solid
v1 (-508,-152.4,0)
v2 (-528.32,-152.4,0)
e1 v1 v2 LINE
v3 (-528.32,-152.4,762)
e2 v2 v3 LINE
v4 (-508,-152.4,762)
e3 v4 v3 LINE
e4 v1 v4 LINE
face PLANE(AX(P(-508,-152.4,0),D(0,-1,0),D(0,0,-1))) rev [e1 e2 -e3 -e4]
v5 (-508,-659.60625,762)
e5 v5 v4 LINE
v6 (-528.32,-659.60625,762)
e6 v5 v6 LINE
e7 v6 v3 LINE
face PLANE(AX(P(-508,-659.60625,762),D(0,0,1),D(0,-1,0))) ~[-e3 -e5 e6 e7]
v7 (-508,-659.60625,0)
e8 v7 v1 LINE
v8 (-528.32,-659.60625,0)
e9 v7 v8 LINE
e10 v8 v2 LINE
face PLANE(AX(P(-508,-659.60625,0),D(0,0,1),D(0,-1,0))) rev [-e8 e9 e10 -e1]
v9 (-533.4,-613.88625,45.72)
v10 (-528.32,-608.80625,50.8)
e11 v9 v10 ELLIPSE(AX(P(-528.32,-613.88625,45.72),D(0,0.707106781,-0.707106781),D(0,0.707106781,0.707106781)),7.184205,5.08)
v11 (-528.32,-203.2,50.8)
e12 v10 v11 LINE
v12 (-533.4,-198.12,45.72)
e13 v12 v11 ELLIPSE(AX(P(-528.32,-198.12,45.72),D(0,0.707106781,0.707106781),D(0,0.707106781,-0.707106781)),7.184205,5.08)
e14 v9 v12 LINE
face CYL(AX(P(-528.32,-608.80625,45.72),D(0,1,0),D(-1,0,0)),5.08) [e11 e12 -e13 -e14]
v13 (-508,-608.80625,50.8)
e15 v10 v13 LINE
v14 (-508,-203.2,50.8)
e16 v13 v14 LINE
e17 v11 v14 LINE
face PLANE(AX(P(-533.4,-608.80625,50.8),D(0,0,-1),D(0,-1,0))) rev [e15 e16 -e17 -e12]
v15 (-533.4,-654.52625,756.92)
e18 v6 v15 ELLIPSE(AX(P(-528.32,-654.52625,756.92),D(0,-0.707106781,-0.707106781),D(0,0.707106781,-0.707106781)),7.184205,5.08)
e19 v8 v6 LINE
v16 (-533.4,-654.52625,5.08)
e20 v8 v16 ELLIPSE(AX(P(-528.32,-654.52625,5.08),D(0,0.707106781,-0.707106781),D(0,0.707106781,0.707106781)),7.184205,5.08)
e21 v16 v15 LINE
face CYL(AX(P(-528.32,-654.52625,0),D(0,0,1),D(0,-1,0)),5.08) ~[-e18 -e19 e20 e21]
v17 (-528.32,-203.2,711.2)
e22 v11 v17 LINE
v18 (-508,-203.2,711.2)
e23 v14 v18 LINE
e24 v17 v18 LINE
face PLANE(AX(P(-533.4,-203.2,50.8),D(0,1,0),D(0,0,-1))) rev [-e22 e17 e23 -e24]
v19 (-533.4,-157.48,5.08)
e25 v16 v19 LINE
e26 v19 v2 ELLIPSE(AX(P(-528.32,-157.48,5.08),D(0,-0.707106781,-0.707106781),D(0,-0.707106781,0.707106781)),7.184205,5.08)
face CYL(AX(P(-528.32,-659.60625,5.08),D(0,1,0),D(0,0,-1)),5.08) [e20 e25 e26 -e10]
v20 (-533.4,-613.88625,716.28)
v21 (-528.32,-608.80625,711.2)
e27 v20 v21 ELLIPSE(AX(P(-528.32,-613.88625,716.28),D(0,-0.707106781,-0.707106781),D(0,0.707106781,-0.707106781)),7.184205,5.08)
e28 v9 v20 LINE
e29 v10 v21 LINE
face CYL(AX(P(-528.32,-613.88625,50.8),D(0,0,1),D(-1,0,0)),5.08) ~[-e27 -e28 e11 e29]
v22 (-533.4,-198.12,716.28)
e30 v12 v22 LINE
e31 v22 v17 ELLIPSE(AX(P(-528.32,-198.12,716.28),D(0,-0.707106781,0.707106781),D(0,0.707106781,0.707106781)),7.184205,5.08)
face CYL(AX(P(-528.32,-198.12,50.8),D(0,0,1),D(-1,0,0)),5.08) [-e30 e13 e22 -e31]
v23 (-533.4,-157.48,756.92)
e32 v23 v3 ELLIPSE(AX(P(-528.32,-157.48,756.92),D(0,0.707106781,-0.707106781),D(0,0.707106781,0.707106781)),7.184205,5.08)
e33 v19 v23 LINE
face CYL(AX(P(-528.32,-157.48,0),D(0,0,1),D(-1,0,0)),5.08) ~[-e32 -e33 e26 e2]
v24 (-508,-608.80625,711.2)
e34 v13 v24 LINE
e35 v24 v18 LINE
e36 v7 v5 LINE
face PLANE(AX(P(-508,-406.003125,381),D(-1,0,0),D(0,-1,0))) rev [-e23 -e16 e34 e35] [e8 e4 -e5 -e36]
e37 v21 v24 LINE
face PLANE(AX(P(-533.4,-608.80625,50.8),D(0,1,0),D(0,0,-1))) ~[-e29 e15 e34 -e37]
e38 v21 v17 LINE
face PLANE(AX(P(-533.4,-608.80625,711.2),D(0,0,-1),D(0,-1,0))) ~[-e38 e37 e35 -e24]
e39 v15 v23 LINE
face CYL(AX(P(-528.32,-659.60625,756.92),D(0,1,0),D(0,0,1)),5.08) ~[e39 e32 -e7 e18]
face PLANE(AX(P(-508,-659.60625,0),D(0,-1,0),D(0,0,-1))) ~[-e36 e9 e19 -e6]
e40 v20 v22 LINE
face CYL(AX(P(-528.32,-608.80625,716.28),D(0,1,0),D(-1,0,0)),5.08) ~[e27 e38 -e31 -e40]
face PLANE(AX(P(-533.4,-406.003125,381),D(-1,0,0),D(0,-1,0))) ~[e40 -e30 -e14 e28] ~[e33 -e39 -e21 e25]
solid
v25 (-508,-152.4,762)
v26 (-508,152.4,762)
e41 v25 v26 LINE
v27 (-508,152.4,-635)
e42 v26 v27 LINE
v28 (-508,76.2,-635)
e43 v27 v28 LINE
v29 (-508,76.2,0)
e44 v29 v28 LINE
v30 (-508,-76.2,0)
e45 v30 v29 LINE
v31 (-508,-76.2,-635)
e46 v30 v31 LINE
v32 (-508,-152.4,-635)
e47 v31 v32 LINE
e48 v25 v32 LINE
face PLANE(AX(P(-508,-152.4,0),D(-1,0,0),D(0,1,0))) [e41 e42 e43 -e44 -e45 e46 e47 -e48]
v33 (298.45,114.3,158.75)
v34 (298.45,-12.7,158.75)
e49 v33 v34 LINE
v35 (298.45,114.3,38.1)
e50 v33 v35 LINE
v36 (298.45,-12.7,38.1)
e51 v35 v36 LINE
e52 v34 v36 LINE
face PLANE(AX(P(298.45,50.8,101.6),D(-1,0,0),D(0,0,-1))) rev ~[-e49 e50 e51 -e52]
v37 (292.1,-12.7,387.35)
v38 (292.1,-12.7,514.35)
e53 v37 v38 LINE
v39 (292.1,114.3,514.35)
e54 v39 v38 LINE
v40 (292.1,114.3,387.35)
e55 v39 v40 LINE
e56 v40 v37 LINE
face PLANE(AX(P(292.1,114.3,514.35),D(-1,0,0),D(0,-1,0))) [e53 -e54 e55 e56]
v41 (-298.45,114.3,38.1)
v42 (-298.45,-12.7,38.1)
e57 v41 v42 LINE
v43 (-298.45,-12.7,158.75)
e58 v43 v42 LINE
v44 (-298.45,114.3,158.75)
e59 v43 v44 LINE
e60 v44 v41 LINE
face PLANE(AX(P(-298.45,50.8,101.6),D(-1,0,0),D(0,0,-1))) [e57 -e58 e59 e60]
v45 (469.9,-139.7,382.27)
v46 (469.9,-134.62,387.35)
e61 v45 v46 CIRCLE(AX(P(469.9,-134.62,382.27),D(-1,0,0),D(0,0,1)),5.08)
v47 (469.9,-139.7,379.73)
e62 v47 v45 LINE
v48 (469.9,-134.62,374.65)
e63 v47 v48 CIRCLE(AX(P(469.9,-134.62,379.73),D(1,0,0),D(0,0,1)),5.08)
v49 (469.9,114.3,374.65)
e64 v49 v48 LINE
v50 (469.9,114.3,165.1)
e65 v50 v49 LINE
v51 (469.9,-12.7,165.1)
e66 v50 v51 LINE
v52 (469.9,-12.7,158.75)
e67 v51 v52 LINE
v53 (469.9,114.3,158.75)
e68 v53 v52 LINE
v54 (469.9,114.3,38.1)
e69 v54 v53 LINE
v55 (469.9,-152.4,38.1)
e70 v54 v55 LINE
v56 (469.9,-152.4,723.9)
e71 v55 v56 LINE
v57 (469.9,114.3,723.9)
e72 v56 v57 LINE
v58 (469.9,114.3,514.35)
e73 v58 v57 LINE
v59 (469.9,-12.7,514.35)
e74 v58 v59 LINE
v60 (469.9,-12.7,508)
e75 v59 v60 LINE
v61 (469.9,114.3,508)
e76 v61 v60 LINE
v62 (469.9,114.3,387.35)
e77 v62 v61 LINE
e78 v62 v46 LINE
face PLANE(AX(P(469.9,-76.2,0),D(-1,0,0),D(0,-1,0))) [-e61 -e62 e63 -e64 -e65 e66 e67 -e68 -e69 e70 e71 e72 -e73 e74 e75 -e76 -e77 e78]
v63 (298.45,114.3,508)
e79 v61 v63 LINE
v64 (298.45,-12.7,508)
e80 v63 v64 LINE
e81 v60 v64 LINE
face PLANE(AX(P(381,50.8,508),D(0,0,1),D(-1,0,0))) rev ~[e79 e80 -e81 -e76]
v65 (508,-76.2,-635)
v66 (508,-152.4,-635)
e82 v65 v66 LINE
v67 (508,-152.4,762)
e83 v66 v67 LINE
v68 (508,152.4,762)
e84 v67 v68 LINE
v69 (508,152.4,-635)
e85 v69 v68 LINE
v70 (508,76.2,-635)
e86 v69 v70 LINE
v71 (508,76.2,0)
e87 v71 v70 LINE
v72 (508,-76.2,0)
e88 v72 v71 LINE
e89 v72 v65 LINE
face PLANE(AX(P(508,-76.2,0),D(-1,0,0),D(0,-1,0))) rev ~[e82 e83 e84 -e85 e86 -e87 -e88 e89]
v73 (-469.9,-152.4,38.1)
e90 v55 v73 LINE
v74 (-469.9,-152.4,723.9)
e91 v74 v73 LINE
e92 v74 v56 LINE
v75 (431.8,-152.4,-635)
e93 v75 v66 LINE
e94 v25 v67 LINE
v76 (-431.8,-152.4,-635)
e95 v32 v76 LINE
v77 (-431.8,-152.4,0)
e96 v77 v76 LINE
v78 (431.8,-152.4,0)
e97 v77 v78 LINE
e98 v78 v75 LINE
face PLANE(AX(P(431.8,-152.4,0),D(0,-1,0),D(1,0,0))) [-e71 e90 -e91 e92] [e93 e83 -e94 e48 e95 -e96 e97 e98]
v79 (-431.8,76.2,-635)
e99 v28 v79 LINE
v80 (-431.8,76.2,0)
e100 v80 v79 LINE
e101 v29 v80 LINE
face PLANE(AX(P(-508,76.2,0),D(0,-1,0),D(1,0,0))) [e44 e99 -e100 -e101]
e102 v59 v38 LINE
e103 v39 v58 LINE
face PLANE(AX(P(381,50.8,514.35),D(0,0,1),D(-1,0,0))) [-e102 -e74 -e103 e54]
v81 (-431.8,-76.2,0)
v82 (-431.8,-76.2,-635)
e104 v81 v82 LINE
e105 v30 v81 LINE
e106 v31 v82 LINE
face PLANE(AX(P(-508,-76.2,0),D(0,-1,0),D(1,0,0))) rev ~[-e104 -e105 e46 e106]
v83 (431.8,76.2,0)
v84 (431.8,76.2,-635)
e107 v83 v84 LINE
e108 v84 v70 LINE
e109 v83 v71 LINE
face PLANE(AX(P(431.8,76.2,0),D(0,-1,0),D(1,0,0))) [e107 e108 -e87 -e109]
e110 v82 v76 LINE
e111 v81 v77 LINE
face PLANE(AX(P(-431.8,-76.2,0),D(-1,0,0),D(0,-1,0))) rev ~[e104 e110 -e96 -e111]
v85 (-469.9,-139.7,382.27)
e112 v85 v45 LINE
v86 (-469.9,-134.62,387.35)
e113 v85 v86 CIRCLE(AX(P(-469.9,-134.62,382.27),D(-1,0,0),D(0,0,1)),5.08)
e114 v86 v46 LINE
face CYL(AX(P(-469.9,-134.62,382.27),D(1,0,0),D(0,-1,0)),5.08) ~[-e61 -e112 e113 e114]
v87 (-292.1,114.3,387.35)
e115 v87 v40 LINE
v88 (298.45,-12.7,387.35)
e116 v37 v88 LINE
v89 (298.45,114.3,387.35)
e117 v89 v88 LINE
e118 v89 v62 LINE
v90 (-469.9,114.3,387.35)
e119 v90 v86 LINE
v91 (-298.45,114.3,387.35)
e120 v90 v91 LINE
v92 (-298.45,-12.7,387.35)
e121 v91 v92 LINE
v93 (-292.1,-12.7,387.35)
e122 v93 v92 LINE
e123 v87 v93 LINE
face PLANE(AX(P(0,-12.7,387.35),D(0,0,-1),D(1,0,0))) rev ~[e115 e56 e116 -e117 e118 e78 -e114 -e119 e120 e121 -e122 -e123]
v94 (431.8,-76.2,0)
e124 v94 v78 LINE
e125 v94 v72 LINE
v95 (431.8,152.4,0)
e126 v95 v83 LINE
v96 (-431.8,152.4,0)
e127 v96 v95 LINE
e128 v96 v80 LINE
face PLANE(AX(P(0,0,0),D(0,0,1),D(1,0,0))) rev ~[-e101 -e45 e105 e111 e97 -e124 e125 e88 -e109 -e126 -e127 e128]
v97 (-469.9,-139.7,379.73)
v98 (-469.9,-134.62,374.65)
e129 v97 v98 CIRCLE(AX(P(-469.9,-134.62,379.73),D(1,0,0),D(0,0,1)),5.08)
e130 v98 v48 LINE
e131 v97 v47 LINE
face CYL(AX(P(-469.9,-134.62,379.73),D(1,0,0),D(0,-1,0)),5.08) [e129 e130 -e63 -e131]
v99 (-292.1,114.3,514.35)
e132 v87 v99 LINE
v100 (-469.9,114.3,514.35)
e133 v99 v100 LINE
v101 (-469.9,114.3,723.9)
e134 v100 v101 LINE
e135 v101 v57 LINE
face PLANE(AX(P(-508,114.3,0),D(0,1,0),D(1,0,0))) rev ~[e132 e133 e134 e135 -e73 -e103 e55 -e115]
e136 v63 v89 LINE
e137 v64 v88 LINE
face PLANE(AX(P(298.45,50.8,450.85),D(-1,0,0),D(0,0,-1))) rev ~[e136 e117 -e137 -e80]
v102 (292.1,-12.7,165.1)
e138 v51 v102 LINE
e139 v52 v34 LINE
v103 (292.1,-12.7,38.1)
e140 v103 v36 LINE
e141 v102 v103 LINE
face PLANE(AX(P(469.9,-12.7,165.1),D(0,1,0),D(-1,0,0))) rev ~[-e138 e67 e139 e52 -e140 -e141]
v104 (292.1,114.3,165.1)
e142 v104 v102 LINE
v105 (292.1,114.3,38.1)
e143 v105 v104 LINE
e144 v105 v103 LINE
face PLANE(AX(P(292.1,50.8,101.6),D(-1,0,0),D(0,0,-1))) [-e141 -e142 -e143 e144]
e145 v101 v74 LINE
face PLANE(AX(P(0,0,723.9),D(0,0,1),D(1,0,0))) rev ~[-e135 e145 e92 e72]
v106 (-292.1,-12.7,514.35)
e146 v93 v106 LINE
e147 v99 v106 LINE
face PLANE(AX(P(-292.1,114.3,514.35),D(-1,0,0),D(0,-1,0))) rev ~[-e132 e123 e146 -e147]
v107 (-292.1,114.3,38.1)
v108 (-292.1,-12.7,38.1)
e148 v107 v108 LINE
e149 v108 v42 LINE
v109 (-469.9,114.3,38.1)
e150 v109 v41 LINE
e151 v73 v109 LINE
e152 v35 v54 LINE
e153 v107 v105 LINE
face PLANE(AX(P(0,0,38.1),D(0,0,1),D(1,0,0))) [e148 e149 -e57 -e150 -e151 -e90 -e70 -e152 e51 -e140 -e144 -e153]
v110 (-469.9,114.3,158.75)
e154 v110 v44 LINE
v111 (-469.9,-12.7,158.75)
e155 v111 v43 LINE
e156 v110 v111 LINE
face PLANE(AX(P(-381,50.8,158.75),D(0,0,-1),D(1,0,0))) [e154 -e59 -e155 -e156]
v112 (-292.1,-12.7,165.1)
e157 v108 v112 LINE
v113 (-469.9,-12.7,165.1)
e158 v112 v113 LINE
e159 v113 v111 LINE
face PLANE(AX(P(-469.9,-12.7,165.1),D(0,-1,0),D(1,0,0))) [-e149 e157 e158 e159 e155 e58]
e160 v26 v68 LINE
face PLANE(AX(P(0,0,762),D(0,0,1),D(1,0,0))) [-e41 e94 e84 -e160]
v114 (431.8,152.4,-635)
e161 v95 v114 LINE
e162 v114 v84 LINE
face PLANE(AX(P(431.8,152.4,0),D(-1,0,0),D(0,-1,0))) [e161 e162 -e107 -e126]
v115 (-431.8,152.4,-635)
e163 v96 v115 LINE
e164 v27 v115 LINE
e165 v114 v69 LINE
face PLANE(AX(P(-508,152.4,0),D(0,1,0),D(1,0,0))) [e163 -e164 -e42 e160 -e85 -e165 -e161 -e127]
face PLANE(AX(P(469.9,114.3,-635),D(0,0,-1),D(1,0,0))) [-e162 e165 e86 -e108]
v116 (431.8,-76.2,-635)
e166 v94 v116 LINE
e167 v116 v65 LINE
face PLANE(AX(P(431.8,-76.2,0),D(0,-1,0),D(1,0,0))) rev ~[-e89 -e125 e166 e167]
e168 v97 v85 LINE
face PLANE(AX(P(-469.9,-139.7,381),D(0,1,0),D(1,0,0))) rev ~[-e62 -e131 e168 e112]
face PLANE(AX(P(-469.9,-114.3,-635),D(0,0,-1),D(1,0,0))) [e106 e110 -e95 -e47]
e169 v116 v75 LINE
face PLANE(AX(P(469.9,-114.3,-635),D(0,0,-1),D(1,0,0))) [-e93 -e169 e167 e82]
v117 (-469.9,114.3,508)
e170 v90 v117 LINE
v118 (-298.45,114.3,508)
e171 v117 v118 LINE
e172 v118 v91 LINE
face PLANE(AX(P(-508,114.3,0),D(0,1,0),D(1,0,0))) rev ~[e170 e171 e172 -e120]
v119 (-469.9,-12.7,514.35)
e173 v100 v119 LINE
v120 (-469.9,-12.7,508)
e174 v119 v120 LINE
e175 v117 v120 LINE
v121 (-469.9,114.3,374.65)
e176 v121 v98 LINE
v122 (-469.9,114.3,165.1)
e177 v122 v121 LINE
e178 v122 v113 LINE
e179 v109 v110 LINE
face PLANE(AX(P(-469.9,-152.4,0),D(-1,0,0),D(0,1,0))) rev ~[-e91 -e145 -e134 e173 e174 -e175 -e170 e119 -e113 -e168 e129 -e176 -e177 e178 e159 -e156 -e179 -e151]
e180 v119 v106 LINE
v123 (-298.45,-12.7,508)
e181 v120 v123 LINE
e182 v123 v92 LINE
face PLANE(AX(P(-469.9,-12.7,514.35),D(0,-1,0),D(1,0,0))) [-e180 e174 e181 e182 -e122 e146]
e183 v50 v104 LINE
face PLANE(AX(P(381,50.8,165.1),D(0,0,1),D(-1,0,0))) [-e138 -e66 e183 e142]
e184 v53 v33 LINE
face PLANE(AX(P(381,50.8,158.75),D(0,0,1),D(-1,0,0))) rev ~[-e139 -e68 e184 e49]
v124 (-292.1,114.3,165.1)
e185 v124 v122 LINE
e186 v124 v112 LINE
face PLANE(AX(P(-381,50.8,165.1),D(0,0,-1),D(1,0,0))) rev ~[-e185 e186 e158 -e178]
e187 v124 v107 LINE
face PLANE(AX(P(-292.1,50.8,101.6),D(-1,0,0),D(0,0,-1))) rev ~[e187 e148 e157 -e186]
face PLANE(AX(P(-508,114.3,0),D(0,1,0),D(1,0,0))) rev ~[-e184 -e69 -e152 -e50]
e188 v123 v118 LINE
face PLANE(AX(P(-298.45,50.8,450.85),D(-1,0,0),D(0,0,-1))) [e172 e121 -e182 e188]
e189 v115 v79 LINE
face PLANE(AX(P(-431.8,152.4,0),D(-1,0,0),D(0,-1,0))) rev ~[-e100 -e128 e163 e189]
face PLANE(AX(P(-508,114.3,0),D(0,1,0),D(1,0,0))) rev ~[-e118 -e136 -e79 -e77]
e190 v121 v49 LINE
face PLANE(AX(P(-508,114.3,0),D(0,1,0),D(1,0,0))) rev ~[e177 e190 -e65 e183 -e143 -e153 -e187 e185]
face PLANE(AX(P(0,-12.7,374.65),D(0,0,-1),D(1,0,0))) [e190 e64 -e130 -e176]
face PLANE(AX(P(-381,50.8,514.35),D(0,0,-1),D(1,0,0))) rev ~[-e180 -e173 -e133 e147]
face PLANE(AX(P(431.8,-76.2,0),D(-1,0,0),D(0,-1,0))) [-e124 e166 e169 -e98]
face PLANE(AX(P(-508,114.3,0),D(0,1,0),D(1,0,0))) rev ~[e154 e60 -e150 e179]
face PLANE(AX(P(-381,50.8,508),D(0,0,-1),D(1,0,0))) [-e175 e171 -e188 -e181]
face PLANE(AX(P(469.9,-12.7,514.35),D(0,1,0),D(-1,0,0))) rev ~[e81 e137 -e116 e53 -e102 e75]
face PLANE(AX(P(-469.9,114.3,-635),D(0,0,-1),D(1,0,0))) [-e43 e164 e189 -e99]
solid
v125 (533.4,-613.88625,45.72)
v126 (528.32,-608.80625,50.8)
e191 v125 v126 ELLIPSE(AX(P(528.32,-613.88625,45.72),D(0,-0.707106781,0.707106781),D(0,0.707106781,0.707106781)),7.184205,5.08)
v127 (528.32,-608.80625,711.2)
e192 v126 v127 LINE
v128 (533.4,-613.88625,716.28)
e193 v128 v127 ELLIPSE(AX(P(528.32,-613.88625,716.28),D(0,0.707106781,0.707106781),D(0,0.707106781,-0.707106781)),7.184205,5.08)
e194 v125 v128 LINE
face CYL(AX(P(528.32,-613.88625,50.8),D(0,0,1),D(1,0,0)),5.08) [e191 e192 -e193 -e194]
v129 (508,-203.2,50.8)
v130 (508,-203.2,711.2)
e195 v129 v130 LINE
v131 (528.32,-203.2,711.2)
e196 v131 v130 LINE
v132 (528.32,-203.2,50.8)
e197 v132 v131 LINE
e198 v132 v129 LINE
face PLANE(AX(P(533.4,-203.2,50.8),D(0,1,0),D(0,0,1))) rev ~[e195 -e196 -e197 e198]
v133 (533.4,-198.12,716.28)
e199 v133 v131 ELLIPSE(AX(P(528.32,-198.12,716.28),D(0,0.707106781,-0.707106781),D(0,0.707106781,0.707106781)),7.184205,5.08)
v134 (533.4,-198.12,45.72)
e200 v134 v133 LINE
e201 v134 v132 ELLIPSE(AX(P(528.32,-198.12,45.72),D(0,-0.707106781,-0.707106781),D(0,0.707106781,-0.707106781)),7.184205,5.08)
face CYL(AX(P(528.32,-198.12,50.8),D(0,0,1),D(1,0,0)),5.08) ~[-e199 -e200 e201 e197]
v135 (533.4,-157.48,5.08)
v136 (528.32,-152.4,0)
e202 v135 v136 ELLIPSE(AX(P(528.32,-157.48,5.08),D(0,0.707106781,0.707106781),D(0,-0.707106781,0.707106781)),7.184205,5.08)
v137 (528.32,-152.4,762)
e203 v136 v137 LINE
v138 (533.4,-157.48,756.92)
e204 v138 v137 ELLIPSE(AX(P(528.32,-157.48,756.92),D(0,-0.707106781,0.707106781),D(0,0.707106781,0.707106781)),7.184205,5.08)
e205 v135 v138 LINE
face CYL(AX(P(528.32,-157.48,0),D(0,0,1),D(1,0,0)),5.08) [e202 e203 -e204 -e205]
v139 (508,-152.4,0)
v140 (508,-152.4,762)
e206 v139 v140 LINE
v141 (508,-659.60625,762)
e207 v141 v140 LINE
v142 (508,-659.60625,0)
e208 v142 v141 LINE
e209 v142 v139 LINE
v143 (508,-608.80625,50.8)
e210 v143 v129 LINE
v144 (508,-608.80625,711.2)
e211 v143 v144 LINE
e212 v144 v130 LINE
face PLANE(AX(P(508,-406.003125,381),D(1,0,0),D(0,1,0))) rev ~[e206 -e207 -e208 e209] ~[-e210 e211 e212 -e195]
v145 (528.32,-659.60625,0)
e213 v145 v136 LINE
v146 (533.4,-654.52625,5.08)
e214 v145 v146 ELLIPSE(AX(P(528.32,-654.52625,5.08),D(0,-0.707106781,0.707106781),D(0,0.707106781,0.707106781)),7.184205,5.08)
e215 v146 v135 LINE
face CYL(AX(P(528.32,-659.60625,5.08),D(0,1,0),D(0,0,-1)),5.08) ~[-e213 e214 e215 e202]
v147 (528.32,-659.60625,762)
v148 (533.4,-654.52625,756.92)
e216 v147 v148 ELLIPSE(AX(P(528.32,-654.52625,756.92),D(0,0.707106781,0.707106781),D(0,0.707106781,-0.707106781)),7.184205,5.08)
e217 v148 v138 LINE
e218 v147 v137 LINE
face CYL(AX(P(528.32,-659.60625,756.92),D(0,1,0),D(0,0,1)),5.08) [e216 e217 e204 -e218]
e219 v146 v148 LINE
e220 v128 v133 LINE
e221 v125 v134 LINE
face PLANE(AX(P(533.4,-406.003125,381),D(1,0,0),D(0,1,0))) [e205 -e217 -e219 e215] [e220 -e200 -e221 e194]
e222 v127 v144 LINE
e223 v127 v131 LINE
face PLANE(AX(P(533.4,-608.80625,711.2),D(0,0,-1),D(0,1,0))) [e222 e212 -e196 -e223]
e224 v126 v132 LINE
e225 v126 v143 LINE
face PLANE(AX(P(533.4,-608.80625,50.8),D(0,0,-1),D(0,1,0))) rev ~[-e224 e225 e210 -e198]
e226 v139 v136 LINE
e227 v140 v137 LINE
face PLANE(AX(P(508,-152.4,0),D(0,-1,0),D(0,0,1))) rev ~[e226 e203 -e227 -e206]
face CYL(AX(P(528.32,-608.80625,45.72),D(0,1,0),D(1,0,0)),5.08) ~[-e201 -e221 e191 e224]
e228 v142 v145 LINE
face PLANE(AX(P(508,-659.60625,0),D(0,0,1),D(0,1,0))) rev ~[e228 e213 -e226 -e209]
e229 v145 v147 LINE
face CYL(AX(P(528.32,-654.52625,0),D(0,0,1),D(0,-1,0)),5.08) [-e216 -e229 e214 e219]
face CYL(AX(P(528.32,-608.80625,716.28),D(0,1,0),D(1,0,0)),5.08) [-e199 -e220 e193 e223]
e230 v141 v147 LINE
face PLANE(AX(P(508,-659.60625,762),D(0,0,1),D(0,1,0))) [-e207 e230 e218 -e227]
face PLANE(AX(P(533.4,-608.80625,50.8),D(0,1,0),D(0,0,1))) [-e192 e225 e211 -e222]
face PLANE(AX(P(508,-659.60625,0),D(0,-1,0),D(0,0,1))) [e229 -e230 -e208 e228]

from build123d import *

# Parameters (mm, degrees)
F0_W               = 1016
F0_H               = 304.8
F1_DEPTH           = 762
F2_W               = 76.2
F2_H               = 76.2
F3_DEPTH           = 635
F4_T               = 38.1
F4_T3_DEPTH        = 152.4
F4_T5_DEPTH        = 152.4
F4_T7_DEPTH        = 152.4
F4_T9_DEPTH        = 152.4
F6_E14_W           = 939.8
F6_E14_H           = 254
F7_DEPTH           = 6.35
F10_E15_W          = 177.8
F10_E15_H          = 127
F10_E19_W          = 177.8
F10_E19_H          = 127
F10_E17_MIRRORCS_W = 177.8
F10_E17_MIRRORCS_H = 127
F10_E21_MIRRORCS_W = 177.8
F10_E21_MIRRORCS_H = 127
F11_DEPTH          = 6.35
F10_E16_W          = 127
F10_E16_H          = 127
F10_E20_W          = 127
F10_E20_H          = 127
F12_DEPTH          = 6.35
F10_E18_MIRRORCS_W = 127
F10_E18_MIRRORCS_H = 127
F10_E22_MIRRORCS_W = 127
F10_E22_MIRRORCS_H = 127
F13_DEPTH          = 6.35
F15_W              = 507.20625
F15_H              = 762
F16_DEPTH          = 25.4
F17_W              = 405.60625
F17_H              = 660.4
F18_DEPTH          = 25.4
F19_R              = 5.08
F21_R              = 5.08


# Not quite as in the source:
# - a shell that OpenCascade refuses in one call is made with other operations: the cavity is built on its own and cut out


with BuildPart() as f1:
    # F0 (on Top) → F1 (new body)
    with BuildSketch(Plane.XY):
        Rectangle(F0_W, F0_H)
    extrude(amount=F1_DEPTH)

    # F2 (on face) → F3 (join)
    with BuildSketch(Plane(origin=(0, 0, 0), x_dir=(1, 0, 0), z_dir=(0, 0, -1))):
        with Locations((469.9, 114.3)):
            Rectangle(F2_W, F2_H)
        with Locations((469.9, -114.3)):
            Rectangle(F2_W, F2_H)
        with Locations((-469.9, 114.3)):
            Rectangle(F2_W, F2_H)
        with Locations((-469.9, -114.3)):
            Rectangle(F2_W, F2_H)
    extrude(amount=F3_DEPTH)

    # F4: shell of thickness 38.1, made by hand


with BuildPart() as f4_core1:
    # F4_t2: copy of F1
    add(f1.part)

    # the walls: a layer under each face that stays
    f4_faces = [f4_core1.faces().sort_by_distance(p)[0] for p in [
        (-469.9, -114.3, -635),
        (-469.9, -76.2, -317.5),
        (-431.8, -114.3, -317.5),
        (0, 0, 0),
        (469.9, -76.2, -317.5),
        (469.9, 76.2, -317.5),
        (469.9, 114.3, -635),
        (431.8, 114.3, -317.5),
        (0, 152.4, 63.5),
        (-469.9, 114.3, -635),
        (-431.8, 114.3, -317.5),
        (-469.9, 76.2, -317.5),
        (431.8, -114.3, -317.5),
        (469.9, -114.3, -635),
        (508, 0, 63.5),
        (0, 0, 762),
        (-508, 0, 63.5),
    ]]
    thicken(f4_faces, amount=-F4_T, mode=Mode.SUBTRACT)

    # F4_s4 → F4_t3 (cut)
    with BuildSketch(Plane.YZ.offset(-546.1)):
        Polygon((-75.819, -0.381), (-114.3, 0), (-114.3, 38.1), (-76.2, 38.1), align=None)
        Polygon((75.819, -0.381), (76.2, 38.1), (114.3, 38.1), (114.3, 0), align=None)
    extrude(amount=F4_T3_DEPTH, mode=Mode.SUBTRACT)

    # F4_s6 → F4_t5 (cut)
    with BuildSketch(Plane.XZ.offset(38.1)):
        Polygon((-431.419, -0.381), (-469.9, 0), (-469.9, 38.1), (-431.8, 38.1), align=None)
        Polygon((431.419, -0.381), (431.8, 38.1), (469.9, 38.1), (469.9, 0), align=None)
    extrude(amount=F4_T5_DEPTH, mode=Mode.SUBTRACT)

    # F4_s8 → F4_t7 (cut)
    with BuildSketch(Plane.XZ.offset(-190.5)):
        Polygon((-431.419, -0.381), (-431.8, 38.1), (-469.9, 38.1), (-469.9, 0), align=None)
        Polygon((431.419, -0.381), (431.8, 38.1), (469.9, 38.1), (469.9, 0), align=None)
    extrude(amount=F4_T7_DEPTH, mode=Mode.SUBTRACT)

    # F4_s10 → F4_t9 (cut)
    with BuildSketch(Plane.YZ.offset(393.7)):
        Polygon((75.819, -0.381), (76.2, 38.1), (114.3, 38.1), (114.3, 0), align=None)
        Polygon((-75.819, -0.381), (-76.2, 38.1), (-114.3, 38.1), (-114.3, 0), align=None)
    extrude(amount=F4_T9_DEPTH, mode=Mode.SUBTRACT)


with BuildPart() as f1_1:
    add(f1.part)

    # what is left inside the walls is the cavity
    f4_cavity = [f4_core1.part.solids().sort_by_distance(p)[0] for p in [
        (0, -152.019, 495.3),
    ]]
    add(f4_cavity, mode=Mode.SUBTRACT)

    # F6_E14 (on explicit) → F7 (join, symmetric)
    with BuildSketch(Plane(origin=(-469.9, 114.3, 381), x_dir=(1, 0, 0), z_dir=(0, 0, -1))):
        with Locations((469.9, 127)):
            Rectangle(F6_E14_W, F6_E14_H)
    extrude(amount=F7_DEPTH, both=True)

    # F10_E15 (on explicit) + F10_E19 (on explicit) + F10_E17_MirrorCS (on explicit) + F10_E21_MirrorCS (on explicit) → F11 (join)
    with BuildSketch(Plane(origin=(-469.9, 114.3, 514.35), x_dir=(1, 0, 0), z_dir=(0, 0, -1))):
        with Locations((88.9, 63.5)):
            Rectangle(F10_E15_W, F10_E15_H)
    with BuildSketch(Plane(origin=(-469.9, 114.3, 165.1), x_dir=(1, 0, 0), z_dir=(0, 0, -1))):
        with Locations((88.9, 63.5)):
            Rectangle(F10_E19_W, F10_E19_H)
    with BuildSketch(Plane(origin=(469.9, 114.3, 514.35), x_dir=(-1, 0, 0), z_dir=(0, 0, 1))):
        with Locations((88.9, 63.5)):
            Rectangle(F10_E17_MIRRORCS_W, F10_E17_MIRRORCS_H)
    with BuildSketch(Plane(origin=(469.9, 114.3, 165.1), x_dir=(-1, 0, 0), z_dir=(0, 0, 1))):
        with Locations((88.9, 63.5)):
            Rectangle(F10_E21_MIRRORCS_W, F10_E21_MIRRORCS_H)
    extrude(amount=F11_DEPTH, dir=(0, 0, -1))

    # F10_E16 (on explicit) + F10_E20 (on explicit) → F12 (join)
    with BuildSketch(Plane(origin=(-292.1, 114.3, 514.35), x_dir=(0, 0, -1), z_dir=(-1, 0, 0))):
        with Locations((63.5, 63.5)):
            Rectangle(F10_E16_W, F10_E16_H)
    with BuildSketch(Plane(origin=(-292.1, 114.3, 165.1), x_dir=(0, 0, -1), z_dir=(-1, 0, 0))):
        with Locations((63.5, 63.5)):
            Rectangle(F10_E20_W, F10_E20_H)
    extrude(amount=F12_DEPTH)

    # F10_E18_MirrorCS (on explicit) + F10_E22_MirrorCS (on explicit) → F13 (join)
    with BuildSketch(Plane(origin=(292.1, 114.3, 514.35), x_dir=(0, 0, -1), z_dir=(-1, 0, 0))):
        with Locations((63.5, 63.5)):
            Rectangle(F10_E18_MIRRORCS_W, F10_E18_MIRRORCS_H)
    with BuildSketch(Plane(origin=(292.1, 114.3, 165.1), x_dir=(0, 0, -1), z_dir=(-1, 0, 0))):
        with Locations((63.5, 63.5)):
            Rectangle(F10_E22_MIRRORCS_W, F10_E22_MIRRORCS_H)
    extrude(amount=-F13_DEPTH)

    # F21
    f21_edges = [f1_1.edges().sort_by_distance(p)[0] for p in [
        (0, -139.7, 374.65),
        (0, -139.7, 387.35),
    ]]
    fillet(f21_edges, radius=F21_R)


with BuildPart() as f16:
    # F15 (on offset) → F16 (new body)
    with BuildSketch(Plane.YZ.offset(508)):
        with Locations((-406.003125, 381)):
            Rectangle(F15_W, F15_H)
    extrude(amount=F16_DEPTH)

    # F17 (on face) → F18 (cut)
    with BuildSketch(Plane.YZ.offset(533.4)):
        with Locations((-406.003125, 381)):
            Rectangle(F17_W, F17_H)
    extrude(amount=-F18_DEPTH, mode=Mode.SUBTRACT)

    # F19
    f19_edges = [f16.edges().sort_by_distance(p)[0] for p in [
        (533.4, -152.4, 381),
        (533.4, -406.003125, 0),
        (533.4, -406.003125, 762),
        (533.4, -659.60625, 381),
        (533.4, -406.003125, 50.8),
        (533.4, -203.2, 381),
        (533.4, -406.003125, 711.2),
        (533.4, -608.80625, 381),
    ]]
    fillet(f19_edges, radius=F19_R)


with BuildPart() as f20_1:
    # F20: instance of F16
    add(f16.part.mirror(Plane.YZ))


solid = Compound([f1_1.part, f16.part, f20_1.part])
